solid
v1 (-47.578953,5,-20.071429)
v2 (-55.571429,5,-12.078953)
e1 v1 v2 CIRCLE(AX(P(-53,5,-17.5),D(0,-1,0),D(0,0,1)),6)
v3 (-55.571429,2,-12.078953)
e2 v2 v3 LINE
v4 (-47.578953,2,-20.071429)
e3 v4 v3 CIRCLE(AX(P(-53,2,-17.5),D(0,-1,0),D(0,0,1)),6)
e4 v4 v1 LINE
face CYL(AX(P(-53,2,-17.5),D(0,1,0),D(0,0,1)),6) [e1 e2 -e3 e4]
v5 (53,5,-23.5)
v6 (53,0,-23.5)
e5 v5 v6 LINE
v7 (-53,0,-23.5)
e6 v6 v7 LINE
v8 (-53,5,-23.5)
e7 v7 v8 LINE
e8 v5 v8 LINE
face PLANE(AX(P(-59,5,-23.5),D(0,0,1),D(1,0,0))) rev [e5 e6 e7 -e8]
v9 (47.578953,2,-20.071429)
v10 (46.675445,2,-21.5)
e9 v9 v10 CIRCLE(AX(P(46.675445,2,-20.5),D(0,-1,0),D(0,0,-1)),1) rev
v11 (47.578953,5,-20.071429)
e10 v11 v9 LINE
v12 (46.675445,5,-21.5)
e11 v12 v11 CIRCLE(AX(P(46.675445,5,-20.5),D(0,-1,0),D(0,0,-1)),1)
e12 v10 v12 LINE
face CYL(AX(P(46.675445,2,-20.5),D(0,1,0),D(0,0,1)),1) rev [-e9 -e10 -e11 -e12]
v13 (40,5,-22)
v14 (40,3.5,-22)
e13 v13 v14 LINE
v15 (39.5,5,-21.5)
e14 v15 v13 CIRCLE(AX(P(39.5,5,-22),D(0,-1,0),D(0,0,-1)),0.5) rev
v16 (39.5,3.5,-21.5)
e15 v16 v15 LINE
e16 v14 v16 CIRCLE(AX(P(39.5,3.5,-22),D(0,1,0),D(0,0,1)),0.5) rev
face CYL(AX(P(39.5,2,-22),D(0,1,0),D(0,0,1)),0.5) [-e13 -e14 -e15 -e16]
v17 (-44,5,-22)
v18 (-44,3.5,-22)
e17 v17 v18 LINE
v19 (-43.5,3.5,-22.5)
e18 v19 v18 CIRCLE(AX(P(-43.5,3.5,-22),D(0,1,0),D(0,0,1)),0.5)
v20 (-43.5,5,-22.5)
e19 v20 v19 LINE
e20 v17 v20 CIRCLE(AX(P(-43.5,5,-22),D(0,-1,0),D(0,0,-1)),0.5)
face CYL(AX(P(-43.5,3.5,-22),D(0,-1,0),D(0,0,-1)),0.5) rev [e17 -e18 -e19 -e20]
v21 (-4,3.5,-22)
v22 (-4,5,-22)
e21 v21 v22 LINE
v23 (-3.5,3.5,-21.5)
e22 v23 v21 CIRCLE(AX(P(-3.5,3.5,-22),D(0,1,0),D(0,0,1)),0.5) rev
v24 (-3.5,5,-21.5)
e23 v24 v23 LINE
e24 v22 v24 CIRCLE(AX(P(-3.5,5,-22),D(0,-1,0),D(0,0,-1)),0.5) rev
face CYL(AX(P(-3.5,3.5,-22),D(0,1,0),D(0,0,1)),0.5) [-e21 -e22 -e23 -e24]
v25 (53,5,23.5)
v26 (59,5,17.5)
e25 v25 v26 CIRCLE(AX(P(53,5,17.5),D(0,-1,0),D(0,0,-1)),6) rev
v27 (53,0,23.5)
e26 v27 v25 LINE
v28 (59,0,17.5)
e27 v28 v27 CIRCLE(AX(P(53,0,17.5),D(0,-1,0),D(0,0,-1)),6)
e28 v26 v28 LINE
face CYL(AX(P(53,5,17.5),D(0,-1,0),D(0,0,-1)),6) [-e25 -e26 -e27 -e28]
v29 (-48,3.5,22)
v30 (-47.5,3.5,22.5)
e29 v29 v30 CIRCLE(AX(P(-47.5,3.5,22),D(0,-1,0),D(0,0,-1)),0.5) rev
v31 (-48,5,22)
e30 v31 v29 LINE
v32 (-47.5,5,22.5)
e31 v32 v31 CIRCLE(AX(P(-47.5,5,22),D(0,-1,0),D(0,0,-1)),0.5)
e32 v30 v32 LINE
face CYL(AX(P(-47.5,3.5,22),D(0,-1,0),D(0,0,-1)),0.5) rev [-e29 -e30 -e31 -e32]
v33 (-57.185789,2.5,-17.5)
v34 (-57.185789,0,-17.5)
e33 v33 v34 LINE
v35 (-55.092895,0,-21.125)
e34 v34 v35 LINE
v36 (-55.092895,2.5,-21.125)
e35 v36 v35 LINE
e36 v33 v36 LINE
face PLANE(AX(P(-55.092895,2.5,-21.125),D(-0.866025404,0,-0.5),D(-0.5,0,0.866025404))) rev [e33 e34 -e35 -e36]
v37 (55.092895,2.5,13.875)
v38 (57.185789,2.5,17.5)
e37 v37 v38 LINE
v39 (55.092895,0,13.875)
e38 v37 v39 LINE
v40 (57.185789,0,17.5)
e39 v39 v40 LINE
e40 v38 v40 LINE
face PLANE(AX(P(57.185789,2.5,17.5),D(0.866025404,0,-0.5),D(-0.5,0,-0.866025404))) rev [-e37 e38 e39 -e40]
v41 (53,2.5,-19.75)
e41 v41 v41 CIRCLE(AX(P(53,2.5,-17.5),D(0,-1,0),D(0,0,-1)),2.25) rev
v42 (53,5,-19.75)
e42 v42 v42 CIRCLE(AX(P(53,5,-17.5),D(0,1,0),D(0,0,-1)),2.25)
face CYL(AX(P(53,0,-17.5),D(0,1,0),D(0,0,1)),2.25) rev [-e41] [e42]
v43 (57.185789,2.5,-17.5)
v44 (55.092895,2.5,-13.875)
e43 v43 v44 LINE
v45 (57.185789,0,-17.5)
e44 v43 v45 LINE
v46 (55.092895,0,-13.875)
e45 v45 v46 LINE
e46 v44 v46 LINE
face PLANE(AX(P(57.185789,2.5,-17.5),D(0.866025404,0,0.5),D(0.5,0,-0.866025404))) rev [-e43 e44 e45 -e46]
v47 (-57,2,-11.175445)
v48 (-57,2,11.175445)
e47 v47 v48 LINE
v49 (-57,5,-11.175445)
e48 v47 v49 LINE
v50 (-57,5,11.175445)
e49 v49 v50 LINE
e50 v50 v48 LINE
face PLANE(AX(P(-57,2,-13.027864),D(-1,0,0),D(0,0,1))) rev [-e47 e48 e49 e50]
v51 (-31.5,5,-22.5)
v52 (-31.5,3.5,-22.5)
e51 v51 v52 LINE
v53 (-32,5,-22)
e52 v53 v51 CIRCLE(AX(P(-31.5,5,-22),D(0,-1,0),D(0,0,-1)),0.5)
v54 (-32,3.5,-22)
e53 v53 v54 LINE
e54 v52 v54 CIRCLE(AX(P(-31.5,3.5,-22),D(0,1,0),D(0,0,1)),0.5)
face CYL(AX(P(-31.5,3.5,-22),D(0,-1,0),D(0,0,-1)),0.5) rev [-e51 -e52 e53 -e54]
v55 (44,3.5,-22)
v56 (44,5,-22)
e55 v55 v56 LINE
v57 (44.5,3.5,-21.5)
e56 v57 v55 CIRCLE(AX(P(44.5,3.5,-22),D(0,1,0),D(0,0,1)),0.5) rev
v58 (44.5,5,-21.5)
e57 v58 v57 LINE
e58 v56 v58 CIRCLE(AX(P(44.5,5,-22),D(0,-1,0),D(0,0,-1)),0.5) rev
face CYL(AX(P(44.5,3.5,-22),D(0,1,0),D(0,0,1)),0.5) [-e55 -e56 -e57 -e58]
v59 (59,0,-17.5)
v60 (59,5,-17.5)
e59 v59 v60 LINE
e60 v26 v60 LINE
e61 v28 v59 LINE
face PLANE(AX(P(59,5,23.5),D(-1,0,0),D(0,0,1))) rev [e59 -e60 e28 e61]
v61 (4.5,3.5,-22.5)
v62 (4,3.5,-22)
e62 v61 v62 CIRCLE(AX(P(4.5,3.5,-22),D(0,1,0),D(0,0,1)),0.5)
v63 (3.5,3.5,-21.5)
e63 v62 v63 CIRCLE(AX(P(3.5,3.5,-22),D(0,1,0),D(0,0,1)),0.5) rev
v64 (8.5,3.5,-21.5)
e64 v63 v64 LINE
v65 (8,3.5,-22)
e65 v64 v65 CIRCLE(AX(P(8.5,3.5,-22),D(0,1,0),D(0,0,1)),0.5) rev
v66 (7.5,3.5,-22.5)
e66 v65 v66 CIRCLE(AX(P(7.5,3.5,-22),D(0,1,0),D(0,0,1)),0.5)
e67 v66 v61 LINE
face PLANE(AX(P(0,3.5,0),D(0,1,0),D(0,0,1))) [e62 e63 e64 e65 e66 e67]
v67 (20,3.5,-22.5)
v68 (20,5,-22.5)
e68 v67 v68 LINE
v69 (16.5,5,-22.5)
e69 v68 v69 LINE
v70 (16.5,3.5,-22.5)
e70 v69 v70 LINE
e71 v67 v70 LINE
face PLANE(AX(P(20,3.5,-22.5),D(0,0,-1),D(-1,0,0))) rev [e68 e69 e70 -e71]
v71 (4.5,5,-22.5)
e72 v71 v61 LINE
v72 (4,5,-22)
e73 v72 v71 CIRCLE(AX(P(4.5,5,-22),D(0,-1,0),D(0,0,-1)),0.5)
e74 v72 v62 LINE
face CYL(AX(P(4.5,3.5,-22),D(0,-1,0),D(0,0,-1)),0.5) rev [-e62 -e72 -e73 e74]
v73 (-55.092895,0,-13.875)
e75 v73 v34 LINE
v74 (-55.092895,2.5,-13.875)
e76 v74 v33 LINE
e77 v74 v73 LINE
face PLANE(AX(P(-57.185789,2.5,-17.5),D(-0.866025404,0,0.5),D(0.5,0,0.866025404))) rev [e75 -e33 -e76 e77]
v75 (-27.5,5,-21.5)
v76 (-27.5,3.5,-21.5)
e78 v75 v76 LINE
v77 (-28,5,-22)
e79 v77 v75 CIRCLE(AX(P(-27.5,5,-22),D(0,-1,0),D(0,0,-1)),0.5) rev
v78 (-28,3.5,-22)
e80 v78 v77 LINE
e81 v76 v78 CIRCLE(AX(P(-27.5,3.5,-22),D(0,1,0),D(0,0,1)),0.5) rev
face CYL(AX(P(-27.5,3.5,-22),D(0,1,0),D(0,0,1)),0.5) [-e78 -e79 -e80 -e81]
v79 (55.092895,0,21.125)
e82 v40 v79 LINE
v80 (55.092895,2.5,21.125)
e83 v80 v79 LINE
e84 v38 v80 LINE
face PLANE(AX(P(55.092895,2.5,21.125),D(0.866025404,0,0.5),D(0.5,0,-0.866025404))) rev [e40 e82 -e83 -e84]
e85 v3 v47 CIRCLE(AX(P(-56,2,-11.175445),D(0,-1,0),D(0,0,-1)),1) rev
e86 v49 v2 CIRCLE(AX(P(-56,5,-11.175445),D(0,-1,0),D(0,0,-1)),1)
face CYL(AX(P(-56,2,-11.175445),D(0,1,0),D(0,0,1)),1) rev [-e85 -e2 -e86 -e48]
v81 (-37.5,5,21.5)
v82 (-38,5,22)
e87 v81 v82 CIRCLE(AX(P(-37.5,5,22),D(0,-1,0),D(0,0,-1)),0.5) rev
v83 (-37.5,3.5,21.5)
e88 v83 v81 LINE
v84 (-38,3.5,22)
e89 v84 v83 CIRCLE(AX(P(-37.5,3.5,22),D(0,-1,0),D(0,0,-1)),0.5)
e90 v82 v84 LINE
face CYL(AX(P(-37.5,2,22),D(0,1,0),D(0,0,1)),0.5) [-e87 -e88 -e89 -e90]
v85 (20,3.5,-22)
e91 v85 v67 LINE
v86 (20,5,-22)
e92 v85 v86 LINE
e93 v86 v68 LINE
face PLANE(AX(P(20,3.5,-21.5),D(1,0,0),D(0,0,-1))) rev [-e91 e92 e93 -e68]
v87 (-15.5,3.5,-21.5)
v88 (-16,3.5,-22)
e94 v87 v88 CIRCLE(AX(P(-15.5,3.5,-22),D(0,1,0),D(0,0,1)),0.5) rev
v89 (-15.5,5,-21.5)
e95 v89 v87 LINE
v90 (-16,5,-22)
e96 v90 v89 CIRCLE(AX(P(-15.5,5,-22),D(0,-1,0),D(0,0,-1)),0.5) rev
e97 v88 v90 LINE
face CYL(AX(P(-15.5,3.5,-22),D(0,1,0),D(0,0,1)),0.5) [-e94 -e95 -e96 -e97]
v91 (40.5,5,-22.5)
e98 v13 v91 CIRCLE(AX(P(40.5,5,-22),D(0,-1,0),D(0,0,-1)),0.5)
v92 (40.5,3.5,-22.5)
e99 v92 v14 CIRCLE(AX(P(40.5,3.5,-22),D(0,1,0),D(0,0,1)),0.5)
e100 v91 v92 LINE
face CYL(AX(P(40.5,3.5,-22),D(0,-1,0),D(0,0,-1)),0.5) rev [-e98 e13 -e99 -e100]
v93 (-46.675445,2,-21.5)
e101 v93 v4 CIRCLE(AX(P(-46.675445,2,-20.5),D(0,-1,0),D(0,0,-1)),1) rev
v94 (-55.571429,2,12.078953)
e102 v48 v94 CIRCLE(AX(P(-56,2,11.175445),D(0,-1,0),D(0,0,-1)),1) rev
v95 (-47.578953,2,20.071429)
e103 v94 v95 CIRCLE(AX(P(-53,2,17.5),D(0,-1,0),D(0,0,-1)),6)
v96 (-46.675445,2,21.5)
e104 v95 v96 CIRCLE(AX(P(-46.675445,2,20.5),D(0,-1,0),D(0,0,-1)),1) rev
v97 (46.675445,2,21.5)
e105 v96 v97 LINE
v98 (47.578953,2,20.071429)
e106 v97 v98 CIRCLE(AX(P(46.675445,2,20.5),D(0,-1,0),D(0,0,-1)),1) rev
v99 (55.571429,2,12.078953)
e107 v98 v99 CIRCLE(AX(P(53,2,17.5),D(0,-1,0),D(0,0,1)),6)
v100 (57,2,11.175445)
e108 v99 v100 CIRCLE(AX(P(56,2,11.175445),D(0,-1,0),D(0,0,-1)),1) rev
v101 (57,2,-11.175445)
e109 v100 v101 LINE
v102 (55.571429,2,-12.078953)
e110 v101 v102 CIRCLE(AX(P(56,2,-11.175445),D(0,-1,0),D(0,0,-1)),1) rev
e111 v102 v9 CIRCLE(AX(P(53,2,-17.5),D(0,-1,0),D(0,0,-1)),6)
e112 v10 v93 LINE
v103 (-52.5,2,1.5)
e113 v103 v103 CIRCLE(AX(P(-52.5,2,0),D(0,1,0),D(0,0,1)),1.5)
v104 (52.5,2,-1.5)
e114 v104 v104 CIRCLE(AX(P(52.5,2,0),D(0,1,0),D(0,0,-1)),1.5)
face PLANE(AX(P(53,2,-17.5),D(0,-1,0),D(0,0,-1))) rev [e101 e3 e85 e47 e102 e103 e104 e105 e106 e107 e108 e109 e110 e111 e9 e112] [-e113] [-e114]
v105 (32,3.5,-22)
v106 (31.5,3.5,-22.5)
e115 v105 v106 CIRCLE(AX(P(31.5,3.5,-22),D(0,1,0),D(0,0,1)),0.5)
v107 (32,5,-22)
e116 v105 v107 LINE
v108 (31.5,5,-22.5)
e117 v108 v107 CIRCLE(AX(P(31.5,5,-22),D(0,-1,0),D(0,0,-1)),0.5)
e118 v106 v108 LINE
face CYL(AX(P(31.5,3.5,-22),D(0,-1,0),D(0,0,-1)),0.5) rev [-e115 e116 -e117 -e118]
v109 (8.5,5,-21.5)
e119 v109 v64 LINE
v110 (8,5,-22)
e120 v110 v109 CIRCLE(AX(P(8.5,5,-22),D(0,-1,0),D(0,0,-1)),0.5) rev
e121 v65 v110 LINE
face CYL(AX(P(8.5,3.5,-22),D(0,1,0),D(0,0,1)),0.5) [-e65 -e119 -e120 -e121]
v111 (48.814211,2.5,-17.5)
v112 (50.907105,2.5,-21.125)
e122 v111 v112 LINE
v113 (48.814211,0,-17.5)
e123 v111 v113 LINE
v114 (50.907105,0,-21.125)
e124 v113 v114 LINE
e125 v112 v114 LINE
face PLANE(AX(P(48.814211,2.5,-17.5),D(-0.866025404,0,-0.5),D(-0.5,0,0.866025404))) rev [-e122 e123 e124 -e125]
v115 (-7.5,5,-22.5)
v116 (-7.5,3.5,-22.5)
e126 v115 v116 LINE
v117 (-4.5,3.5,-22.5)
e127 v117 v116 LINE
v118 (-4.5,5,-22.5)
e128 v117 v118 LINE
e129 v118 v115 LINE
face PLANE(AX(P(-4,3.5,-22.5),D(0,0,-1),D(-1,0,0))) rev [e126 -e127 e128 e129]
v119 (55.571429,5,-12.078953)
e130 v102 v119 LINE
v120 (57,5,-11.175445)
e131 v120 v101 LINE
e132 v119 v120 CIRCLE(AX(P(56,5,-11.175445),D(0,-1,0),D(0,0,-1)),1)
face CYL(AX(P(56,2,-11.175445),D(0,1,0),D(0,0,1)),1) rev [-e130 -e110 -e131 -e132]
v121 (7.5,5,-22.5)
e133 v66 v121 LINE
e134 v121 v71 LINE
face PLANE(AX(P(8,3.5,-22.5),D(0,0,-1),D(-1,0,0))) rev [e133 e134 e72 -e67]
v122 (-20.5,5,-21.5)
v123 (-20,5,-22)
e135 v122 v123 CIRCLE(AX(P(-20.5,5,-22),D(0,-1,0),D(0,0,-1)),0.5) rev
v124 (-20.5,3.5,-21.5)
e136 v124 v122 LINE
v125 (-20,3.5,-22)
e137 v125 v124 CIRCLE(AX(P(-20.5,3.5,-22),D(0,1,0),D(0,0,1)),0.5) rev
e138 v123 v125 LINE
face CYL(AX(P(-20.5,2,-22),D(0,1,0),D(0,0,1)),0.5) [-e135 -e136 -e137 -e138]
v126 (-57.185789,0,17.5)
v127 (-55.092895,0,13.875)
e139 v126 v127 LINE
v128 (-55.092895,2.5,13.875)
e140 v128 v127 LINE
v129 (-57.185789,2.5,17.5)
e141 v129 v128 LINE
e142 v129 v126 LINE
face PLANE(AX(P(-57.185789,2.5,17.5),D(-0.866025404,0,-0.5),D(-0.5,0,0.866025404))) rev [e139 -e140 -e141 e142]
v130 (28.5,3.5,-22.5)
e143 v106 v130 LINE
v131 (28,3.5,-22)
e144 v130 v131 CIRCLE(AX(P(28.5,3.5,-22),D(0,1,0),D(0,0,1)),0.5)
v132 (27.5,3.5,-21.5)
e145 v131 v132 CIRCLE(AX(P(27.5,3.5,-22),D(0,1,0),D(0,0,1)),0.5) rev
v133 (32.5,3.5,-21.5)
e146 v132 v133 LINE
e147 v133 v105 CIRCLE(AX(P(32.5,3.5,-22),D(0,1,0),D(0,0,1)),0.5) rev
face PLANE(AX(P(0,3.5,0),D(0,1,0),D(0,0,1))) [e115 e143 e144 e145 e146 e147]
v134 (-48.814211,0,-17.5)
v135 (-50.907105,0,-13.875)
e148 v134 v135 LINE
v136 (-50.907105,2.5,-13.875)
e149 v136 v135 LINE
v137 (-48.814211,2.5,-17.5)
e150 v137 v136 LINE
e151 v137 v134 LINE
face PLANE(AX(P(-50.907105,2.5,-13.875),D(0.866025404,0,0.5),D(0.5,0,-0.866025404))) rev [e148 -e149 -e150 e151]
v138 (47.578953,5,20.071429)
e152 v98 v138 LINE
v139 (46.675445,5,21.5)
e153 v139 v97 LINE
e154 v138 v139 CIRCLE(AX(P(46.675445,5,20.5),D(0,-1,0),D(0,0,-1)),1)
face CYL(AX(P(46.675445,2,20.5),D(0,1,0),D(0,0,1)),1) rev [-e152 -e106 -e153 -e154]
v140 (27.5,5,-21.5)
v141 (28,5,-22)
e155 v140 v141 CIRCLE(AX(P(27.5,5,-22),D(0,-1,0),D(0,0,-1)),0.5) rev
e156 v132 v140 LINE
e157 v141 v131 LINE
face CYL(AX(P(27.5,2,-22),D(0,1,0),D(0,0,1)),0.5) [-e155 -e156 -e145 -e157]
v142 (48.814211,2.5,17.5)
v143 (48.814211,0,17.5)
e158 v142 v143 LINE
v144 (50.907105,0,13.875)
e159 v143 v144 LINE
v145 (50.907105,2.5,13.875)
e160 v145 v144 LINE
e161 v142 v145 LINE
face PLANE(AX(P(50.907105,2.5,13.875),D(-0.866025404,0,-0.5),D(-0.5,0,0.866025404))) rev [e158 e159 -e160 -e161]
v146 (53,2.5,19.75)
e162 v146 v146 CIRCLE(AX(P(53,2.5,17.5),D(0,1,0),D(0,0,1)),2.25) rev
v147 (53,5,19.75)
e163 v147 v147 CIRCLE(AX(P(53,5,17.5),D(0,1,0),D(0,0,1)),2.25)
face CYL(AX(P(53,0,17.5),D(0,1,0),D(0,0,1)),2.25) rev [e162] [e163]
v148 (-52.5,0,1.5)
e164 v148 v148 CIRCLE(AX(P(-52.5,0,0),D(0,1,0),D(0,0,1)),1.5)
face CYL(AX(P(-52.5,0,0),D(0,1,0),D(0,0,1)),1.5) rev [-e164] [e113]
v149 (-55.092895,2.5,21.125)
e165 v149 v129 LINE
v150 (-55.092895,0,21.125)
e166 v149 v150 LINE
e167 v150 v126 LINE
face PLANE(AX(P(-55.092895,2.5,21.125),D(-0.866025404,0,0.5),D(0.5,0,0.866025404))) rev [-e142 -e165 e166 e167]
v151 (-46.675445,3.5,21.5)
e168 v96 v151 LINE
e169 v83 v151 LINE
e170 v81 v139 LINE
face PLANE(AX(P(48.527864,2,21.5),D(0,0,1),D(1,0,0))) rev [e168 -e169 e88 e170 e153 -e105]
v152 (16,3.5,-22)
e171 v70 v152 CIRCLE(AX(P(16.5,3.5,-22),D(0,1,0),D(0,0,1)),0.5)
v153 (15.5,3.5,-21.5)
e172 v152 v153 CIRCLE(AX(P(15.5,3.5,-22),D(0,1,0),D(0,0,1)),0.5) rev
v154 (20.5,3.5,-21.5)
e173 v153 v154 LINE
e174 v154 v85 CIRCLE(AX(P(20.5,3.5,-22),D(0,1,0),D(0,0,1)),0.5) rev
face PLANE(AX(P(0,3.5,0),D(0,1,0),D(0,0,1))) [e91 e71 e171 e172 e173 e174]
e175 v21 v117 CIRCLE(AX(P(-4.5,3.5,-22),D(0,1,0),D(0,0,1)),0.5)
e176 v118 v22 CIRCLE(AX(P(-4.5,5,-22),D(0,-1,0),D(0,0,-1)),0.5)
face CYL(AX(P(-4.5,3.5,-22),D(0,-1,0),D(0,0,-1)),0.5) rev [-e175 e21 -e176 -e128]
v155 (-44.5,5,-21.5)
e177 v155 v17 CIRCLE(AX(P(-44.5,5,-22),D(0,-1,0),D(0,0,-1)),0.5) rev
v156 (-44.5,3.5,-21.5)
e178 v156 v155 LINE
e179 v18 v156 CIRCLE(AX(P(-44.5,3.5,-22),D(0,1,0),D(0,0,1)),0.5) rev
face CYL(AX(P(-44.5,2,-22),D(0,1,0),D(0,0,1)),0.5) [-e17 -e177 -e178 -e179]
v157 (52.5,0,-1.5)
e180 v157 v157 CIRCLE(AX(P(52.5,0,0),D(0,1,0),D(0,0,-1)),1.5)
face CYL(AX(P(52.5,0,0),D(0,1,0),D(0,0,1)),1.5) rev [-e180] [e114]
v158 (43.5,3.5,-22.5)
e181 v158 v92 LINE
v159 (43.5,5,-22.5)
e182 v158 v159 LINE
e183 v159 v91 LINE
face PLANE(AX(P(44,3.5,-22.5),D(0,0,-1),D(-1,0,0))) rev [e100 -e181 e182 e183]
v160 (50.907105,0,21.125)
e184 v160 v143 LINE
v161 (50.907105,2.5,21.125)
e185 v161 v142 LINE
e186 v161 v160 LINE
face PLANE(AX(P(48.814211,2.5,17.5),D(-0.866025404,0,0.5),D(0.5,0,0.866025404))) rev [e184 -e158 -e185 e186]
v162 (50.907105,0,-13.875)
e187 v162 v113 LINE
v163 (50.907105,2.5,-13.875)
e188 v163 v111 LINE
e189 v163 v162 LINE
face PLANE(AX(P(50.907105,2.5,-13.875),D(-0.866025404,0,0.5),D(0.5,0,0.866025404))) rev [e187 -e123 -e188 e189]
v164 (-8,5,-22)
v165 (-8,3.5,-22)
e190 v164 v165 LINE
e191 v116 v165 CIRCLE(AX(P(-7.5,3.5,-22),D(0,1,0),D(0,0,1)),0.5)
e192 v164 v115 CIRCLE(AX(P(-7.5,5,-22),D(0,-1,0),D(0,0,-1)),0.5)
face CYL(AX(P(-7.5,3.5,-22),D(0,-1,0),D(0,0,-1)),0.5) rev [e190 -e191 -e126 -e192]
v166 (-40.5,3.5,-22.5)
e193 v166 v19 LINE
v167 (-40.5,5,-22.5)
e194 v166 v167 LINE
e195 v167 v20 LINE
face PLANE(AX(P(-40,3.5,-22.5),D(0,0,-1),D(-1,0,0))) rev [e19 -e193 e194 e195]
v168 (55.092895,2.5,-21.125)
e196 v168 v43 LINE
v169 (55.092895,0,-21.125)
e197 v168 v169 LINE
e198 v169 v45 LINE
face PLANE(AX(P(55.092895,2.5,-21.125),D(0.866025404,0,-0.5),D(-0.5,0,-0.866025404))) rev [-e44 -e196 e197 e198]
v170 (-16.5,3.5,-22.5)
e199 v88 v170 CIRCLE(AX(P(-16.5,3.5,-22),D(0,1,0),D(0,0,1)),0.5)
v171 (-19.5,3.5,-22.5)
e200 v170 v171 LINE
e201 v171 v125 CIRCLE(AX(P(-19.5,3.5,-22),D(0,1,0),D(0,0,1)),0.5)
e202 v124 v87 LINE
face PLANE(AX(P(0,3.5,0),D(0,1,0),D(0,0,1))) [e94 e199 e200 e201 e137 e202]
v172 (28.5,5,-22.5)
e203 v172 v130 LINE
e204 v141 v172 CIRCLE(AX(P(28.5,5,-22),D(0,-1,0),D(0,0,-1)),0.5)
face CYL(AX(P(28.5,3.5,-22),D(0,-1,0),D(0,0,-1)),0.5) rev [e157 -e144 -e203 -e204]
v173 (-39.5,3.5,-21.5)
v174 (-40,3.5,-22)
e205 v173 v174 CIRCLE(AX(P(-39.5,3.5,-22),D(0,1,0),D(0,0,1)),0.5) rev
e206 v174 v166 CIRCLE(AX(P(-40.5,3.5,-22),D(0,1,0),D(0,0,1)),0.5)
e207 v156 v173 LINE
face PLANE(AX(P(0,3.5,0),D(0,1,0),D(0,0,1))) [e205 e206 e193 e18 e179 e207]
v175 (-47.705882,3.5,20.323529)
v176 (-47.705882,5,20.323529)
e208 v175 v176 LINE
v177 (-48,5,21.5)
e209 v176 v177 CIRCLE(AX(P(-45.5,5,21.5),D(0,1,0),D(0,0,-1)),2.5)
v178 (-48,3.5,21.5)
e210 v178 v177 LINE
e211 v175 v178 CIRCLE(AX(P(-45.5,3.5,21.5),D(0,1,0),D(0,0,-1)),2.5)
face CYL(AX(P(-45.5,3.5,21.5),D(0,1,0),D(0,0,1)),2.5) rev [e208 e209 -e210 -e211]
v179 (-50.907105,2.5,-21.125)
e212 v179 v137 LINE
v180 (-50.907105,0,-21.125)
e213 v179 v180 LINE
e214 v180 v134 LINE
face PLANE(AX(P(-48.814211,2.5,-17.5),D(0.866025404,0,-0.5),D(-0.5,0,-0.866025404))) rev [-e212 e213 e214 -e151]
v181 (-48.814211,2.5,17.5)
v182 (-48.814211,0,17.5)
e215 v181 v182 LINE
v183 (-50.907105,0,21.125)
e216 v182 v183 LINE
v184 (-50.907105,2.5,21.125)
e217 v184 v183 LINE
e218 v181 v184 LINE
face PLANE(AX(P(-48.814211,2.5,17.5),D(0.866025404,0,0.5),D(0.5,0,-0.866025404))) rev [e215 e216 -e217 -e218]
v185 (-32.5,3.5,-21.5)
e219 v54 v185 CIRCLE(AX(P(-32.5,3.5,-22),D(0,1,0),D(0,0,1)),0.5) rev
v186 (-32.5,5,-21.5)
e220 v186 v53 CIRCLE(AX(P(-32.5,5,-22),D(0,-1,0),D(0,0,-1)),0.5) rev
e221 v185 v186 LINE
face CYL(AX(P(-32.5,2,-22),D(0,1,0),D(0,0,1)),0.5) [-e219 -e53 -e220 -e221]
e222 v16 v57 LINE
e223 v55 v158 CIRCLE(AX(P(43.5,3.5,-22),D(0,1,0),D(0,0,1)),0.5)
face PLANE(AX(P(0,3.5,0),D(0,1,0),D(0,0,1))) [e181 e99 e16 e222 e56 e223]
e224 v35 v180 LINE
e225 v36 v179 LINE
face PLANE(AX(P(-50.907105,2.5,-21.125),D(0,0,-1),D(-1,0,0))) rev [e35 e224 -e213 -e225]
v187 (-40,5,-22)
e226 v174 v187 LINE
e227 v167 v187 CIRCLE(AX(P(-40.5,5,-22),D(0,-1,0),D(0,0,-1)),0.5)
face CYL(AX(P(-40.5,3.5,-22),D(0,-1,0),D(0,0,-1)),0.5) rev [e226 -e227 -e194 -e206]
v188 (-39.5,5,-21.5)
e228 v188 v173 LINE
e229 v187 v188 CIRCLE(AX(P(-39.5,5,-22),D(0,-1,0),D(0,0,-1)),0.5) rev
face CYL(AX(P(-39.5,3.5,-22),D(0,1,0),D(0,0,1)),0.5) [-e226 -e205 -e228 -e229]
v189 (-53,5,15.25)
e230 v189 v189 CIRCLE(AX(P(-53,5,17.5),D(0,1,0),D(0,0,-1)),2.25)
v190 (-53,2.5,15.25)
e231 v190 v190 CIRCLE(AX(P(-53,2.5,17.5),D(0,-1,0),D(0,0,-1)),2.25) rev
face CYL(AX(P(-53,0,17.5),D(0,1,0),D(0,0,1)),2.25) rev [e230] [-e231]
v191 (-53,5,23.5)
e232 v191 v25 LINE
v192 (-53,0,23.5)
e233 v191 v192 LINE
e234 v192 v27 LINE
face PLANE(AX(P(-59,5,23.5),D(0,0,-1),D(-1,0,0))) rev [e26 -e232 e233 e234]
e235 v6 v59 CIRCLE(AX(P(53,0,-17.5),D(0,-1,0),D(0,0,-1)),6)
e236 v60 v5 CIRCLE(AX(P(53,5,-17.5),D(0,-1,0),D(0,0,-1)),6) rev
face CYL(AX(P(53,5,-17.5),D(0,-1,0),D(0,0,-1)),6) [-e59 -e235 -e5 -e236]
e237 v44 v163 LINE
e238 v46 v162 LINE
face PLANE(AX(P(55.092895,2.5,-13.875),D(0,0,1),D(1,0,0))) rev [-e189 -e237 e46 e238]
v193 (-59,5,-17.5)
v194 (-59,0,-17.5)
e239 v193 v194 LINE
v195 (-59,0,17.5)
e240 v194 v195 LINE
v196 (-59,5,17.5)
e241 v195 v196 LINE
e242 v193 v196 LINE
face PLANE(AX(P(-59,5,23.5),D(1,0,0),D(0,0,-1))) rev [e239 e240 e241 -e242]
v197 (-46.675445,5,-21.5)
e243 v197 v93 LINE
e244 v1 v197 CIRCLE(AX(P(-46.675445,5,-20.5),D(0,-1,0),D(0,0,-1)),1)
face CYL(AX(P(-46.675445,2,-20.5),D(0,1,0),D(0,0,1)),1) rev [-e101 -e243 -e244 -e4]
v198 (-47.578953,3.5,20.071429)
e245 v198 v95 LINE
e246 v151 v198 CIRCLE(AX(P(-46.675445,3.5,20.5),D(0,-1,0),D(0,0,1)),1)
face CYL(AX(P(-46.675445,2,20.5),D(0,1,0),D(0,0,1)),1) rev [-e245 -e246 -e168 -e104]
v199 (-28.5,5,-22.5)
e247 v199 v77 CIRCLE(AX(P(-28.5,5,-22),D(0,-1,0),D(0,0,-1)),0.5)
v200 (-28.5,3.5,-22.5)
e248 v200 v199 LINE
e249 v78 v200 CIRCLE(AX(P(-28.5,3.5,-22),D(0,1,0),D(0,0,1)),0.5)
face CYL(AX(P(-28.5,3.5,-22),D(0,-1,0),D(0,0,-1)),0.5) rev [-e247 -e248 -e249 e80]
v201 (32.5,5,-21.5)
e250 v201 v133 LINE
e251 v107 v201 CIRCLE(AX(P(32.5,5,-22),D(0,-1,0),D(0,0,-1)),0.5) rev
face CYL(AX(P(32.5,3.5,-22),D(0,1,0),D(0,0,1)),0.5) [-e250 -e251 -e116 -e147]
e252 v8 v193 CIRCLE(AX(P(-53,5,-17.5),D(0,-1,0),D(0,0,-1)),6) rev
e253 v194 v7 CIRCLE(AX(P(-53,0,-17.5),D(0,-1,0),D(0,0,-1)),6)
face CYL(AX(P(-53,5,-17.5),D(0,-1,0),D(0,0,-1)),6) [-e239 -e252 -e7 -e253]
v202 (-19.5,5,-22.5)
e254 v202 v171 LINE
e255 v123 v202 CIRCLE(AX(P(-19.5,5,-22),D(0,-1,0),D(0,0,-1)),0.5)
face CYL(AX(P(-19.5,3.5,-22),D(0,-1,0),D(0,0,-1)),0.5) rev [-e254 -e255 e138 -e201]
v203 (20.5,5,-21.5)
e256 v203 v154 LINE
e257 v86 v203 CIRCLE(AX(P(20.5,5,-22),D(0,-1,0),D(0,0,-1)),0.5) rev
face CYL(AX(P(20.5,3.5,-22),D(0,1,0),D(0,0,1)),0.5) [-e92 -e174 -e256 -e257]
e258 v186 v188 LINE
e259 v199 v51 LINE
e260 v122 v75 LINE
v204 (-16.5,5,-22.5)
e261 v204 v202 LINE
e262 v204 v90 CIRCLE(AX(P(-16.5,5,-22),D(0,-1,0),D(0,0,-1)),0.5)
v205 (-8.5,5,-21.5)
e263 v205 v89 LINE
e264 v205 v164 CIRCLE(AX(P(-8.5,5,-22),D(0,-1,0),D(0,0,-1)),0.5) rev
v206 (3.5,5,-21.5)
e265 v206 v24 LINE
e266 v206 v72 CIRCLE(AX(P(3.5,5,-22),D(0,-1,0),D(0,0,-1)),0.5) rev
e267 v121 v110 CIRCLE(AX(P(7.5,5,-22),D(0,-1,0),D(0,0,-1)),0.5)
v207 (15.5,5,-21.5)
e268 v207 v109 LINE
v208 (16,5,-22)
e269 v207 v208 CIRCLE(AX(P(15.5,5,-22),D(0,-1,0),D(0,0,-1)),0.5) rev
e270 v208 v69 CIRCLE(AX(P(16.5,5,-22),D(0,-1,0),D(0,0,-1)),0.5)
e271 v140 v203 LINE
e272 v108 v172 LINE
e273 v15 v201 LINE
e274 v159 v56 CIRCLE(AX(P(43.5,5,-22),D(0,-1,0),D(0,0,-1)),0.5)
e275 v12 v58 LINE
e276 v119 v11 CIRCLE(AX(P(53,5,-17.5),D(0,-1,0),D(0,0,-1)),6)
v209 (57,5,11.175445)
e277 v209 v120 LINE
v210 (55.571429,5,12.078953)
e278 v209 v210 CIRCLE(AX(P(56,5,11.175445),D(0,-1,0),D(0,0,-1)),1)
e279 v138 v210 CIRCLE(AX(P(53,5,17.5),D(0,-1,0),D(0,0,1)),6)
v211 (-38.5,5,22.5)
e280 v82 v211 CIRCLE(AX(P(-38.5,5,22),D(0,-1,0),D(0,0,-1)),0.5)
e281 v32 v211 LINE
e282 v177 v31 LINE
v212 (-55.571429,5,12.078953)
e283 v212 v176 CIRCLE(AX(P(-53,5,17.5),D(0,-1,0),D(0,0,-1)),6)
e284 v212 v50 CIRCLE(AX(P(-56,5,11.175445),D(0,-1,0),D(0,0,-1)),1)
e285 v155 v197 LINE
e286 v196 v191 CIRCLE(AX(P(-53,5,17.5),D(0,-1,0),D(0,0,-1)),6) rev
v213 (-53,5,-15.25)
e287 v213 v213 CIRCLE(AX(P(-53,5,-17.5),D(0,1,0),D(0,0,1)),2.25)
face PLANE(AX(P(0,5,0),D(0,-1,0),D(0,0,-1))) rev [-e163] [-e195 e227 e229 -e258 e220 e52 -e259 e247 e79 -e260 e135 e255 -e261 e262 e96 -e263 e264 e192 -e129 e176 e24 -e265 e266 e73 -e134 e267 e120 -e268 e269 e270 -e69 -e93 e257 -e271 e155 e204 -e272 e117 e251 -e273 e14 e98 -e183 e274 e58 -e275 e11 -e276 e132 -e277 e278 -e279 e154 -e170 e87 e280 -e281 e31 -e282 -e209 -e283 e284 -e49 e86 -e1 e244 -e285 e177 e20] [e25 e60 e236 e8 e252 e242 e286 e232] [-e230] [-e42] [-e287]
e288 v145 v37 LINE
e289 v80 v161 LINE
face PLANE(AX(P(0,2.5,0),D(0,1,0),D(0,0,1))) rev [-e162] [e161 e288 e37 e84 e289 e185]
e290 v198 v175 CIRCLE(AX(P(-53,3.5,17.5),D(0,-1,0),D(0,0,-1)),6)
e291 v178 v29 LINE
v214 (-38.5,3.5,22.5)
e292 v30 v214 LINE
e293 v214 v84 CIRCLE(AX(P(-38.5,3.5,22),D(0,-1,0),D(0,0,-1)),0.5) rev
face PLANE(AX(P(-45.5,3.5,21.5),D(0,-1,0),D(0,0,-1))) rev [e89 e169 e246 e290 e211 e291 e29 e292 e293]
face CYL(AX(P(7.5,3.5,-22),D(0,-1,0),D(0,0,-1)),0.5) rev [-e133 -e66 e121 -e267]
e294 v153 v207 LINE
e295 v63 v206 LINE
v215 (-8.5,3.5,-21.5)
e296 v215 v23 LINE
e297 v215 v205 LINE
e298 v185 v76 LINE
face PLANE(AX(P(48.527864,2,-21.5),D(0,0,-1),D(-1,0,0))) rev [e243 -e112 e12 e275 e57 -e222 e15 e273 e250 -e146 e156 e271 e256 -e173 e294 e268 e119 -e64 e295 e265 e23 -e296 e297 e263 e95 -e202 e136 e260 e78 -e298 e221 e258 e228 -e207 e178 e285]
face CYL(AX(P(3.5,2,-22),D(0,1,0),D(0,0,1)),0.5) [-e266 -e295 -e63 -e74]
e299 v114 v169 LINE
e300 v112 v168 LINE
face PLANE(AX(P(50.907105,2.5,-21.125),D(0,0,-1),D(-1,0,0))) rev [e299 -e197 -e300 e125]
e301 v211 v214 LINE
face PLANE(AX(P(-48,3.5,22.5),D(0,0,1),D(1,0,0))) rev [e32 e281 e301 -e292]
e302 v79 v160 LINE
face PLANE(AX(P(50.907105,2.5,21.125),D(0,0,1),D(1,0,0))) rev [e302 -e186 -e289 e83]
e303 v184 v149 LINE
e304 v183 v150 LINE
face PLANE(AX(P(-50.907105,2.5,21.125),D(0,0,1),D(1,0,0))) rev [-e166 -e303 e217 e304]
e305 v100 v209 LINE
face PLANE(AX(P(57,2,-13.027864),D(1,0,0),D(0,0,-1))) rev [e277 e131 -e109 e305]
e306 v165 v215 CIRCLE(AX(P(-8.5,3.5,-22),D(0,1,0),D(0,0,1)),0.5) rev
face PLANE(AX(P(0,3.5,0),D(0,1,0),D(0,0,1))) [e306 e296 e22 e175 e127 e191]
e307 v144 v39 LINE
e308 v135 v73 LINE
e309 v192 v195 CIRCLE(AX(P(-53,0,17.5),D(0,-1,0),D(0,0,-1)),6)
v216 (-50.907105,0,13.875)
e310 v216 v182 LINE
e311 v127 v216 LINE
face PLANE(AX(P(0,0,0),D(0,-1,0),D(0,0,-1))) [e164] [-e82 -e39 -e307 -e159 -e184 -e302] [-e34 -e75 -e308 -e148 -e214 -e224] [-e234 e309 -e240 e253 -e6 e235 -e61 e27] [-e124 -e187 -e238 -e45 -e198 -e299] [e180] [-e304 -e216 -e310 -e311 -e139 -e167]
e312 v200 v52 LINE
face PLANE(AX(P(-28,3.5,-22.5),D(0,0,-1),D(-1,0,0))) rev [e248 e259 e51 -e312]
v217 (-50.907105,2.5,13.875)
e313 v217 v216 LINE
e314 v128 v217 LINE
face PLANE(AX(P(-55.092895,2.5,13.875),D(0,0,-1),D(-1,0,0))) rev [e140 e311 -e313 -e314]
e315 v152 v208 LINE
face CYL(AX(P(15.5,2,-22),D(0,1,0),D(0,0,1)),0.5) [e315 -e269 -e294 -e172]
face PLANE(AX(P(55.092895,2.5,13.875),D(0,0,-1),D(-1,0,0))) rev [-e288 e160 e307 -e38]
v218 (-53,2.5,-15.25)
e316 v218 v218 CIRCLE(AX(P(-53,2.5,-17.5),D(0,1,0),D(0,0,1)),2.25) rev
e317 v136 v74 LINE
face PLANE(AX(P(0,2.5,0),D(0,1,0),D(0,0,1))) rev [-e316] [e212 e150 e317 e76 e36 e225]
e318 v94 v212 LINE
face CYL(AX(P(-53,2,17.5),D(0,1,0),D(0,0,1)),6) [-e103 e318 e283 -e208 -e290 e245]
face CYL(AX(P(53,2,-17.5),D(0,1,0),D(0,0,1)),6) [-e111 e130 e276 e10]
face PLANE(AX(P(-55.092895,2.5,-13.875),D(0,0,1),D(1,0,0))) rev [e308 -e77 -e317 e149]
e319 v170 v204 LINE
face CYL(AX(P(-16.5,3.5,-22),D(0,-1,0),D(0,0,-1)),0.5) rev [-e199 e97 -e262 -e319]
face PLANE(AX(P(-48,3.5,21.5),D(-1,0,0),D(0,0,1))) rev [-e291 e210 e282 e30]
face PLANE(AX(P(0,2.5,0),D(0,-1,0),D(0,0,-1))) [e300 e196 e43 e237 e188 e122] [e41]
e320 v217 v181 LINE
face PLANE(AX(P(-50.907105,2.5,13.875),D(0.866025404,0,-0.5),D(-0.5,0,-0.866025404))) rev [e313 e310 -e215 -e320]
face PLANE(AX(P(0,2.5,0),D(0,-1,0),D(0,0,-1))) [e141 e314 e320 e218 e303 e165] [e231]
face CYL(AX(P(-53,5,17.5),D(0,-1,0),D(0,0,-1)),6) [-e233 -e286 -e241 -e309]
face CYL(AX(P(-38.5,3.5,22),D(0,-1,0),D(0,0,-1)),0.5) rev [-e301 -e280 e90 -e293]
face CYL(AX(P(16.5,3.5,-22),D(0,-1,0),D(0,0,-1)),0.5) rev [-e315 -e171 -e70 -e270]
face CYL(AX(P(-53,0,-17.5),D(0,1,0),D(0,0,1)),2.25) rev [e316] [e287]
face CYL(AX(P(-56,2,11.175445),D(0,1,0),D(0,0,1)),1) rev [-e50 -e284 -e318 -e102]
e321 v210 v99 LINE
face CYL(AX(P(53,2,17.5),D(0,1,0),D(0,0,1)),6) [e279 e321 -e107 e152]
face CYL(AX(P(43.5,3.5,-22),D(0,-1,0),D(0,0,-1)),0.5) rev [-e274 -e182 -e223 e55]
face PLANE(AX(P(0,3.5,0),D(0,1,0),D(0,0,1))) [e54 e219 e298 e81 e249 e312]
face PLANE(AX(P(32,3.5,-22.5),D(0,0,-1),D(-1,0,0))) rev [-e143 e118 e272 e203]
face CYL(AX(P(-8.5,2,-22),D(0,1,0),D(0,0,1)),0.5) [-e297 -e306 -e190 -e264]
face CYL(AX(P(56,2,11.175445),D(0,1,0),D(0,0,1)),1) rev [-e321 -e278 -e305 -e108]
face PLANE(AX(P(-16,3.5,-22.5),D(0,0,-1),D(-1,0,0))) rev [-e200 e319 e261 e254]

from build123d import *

# Parameters (mm, degrees)
SKETCH1_W           = 118
SKETCH1_H           = 47
BOSS_EXTRUDE1_DEPTH = 5
FILLET1_R           = 6
SKETCH4_R           = 2.25
CUT_EXTRUDE1_DEPTH  = 64.704395453
CUT_EXTRUDE2_DEPTH  = 2.5
CUT_EXTRUDE3_DEPTH  = 3
FILLET2_R           = 1
SKETCH7_W           = 4
SKETCH7_H           = 1
CUT_EXTRUDE4_DEPTH  = 1.5
FILLET3_START       = 3.5
FILLET3_DEPTH       = 2.5
FILLET3_2_DEPTH     = 1.5
SKETCH8_R           = 1.5
CUT_EXTRUDE5_DEPTH  = 64.578691399


with BuildPart() as part:
    # Sketch1 → Boss-Extrude1 (new body)
    with BuildSketch(Plane(origin=(0, 0, 0), x_dir=(1, 0, 0), z_dir=(0, 1, 0))):
        Rectangle(SKETCH1_W, SKETCH1_H)
    extrude(amount=BOSS_EXTRUDE1_DEPTH)

    # Fillet1
    fillet1_edges = [part.edges().sort_by_distance(p)[0] for p in [
        (59, 2.5, 23.5),
        (-59, 2.5, 23.5),
        (-59, 2.5, -23.5),
        (59, 2.5, -23.5),
    ]]
    fillet(fillet1_edges, radius=FILLET1_R)

    # Sketch4 → Cut-Extrude1 (cut, through all)
    with BuildSketch(Plane(origin=(0, 5, 0), x_dir=(1, 0, 0), z_dir=(0, 1, 0))):
        with Locations(Location((53, -17.5, 0), (0, 0, 270))):
            Circle(SKETCH4_R)
        with Locations(Location((-53, -17.5, 0), (0, 0, 90))):
            Circle(SKETCH4_R)
        with Locations(Location((53, 17.5, 0), (0, 0, 90))):
            Circle(SKETCH4_R)
        with Locations(Location((-53, 17.5, 0), (0, 0, 270))):
            Circle(SKETCH4_R)
    extrude(amount=-CUT_EXTRUDE1_DEPTH, mode=Mode.SUBTRACT)

    # Sketch5 → Cut-Extrude2 (cut)
    with BuildSketch(Plane.XZ):
        Polygon((50.907105274, -13.875), (48.814210548, -17.5), (50.907105274, -21.125), (55.092894726, -21.125), (57.185789452, -17.5), (55.092894726, -13.875), align=None)
        Polygon((57.185789452, 17.5), (55.092894726, 13.875), (50.907105274, 13.875), (48.814210548, 17.5), (50.907105274, 21.125), (55.092894726, 21.125), align=None)
        Polygon((-57.185789452, -17.5), (-55.092894726, -13.875), (-50.907105274, -13.875), (-48.814210548, -17.5), (-50.907105274, -21.125), (-55.092894726, -21.125), align=None)
        Polygon((-55.092894726, 13.875), (-50.907105274, 13.875), (-48.814210548, 17.5), (-50.907105274, 21.125), (-55.092894726, 21.125), (-57.185789452, 17.5), align=None)
    extrude(amount=-CUT_EXTRUDE2_DEPTH, mode=Mode.SUBTRACT)

    # Sketch6 → Cut-Extrude3 (cut)
    with BuildSketch(Plane(origin=(0, 5, 0), x_dir=(1, 0, 0), z_dir=(0, 1, 0))):
        with BuildLine():
            Line((57, 13.027864045), (57, -13.027864045))
            ThreePointArc((57, -13.027864045), (48.757359313, -13.257359313), (48.527864045, -21.5))
            Line((48.527864045, -21.5), (-48.527864045, -21.5))
            ThreePointArc((-48.527864045, -21.5), (-48.757359313, -13.257359313), (-57, -13.027864045))
            Line((-57, -13.027864045), (-57, 13.027864045))
            ThreePointArc((-57, 13.027864045), (-48.757359313, 13.257359313), (-48.527864045, 21.5))
            Line((-48.527864045, 21.5), (48.527864045, 21.5))
            ThreePointArc((48.527864045, 21.5), (48.757359313, 13.257359313), (57, 13.027864045))
        make_face()
    extrude(amount=-CUT_EXTRUDE3_DEPTH, mode=Mode.SUBTRACT)

    # Fillet2
    fillet2_edges = [part.edges().sort_by_distance(p)[0] for p in [
        (48.527864045, 3.5, -21.5),
        (57, 3.5, -13.027864045),
        (57, 3.5, 13.027864045),
        (48.527864045, 3.5, 21.5),
        (-48.527864045, 3.5, 21.5),
        (-57, 3.5, 13.027864045),
        (-57, 3.5, -13.027864045),
        (-48.527864045, 3.5, -21.5),
    ]]
    fillet(fillet2_edges, radius=FILLET2_R)

    # Sketch7 → Cut-Extrude4 (cut)
    with BuildSketch(Plane(origin=(0, 5, 0), x_dir=(1, 0, 0), z_dir=(0, 1, 0))):
        with BuildLine():
            Line((-48, -21.5), (-48, -22.5))
            Line((-48, -22.5), (-38, -22.5))
            Line((-38, -22.5), (-38, -21.5))
            Line((-38, -21.5), (-46.67544468, -21.5))
            ThreePointArc((-46.67544468, -21.5), (-47.520598934, -21.034522484), (-47.578952583, -20.071428571))
            ThreePointArc((-47.578952583, -20.071428571), (-47.640934848, -20.198225473), (-47.705882353, -20.323529412))
            ThreePointArc((-47.705882353, -20.323529412), (-47.92535625, -20.893660937), (-48, -21.5))
        make_face()
        with Locations((-42, 22)):
            Rectangle(SKETCH7_W, SKETCH7_H)
        with Locations((-30, 22)):
            Rectangle(SKETCH7_W, SKETCH7_H)
        with Locations((-18, 22)):
            Rectangle(SKETCH7_W, SKETCH7_H)
        with Locations((-6, 22)):
            Rectangle(SKETCH7_W, SKETCH7_H)
        with Locations((6, 22)):
            Rectangle(SKETCH7_W, SKETCH7_H)
        with Locations((18, 22)):
            Rectangle(SKETCH7_W, SKETCH7_H)
        with Locations((30, 22)):
            Rectangle(SKETCH7_W, SKETCH7_H)
        with Locations((42, 22)):
            Rectangle(SKETCH7_W, SKETCH7_H)
    extrude(amount=-CUT_EXTRUDE4_DEPTH, mode=Mode.SUBTRACT)

    # Fillet3: read off the stored shape, not the designer's step
    # Fillet3 outline → Fillet3 (cut)
    with BuildSketch(Plane(origin=(0, 0, 0), x_dir=(1, 0, 0), z_dir=(0, 1, 0)).offset(FILLET3_START)):
        with BuildLine():
            Line((-40, 21.5), (-39.5, 21.5))
            ThreePointArc((-39.5, 21.5), (-39.853553391, 21.646446609), (-40, 22))
            Line((-40, 22), (-40, 21.5))
        make_face()
        with BuildLine():
            Line((-28, 21.5), (-27.5, 21.5))
            ThreePointArc((-27.5, 21.5), (-27.853553391, 21.646446609), (-28, 22))
            Line((-28, 22), (-28, 21.5))
        make_face()
        with BuildLine():
            Line((-16, 21.5), (-15.5, 21.5))
            ThreePointArc((-15.5, 21.5), (-15.853553391, 21.646446609), (-16, 22))
            Line((-16, 22), (-16, 21.5))
        make_face()
        with BuildLine():
            Line((-4, 21.5), (-3.5, 21.5))
            ThreePointArc((-3.5, 21.5), (-3.853553391, 21.646446609), (-4, 22))
            Line((-4, 22), (-4, 21.5))
        make_face()
        with BuildLine():
            Line((8, 21.5), (8.5, 21.5))
            ThreePointArc((8.5, 21.5), (8.146446609, 21.646446609), (8, 22))
            Line((8, 22), (8, 21.5))
        make_face()
        with BuildLine():
            Line((20, 21.5), (20.5, 21.5))
            ThreePointArc((20.5, 21.5), (20.146446609, 21.646446609), (20, 22))
            Line((20, 22), (20, 21.5))
        make_face()
        with BuildLine():
            Line((32, 21.5), (32.5, 21.5))
            ThreePointArc((32.5, 21.5), (32.146446609, 21.646446609), (32, 22))
            Line((32, 22), (32, 21.5))
        make_face()
        with BuildLine():
            ThreePointArc((44.5, 21.5), (44.146446609, 21.646446609), (44, 22))
            Line((44, 22), (44, 21.5))
            Line((44, 21.5), (44.5, 21.5))
        make_face()
        with BuildLine():
            Line((39.5, 21.5), (40, 21.5))
            Line((40, 21.5), (40, 22))
            ThreePointArc((40, 22), (39.853553391, 21.646446609), (39.5, 21.5))
        make_face()
        with BuildLine():
            Line((27.5, 21.5), (28, 21.5))
            Line((28, 21.5), (28, 22))
            ThreePointArc((28, 22), (27.853553391, 21.646446609), (27.5, 21.5))
        make_face()
        with BuildLine():
            Line((15.5, 21.5), (16, 21.5))
            Line((16, 21.5), (16, 22))
            ThreePointArc((16, 22), (15.853553391, 21.646446609), (15.5, 21.5))
        make_face()
        with BuildLine():
            Line((3.5, 21.5), (4, 21.5))
            Line((4, 21.5), (4, 22))
            ThreePointArc((4, 22), (3.853553391, 21.646446609), (3.5, 21.5))
        make_face()
        with BuildLine():
            Line((-8.5, 21.5), (-8, 21.5))
            Line((-8, 21.5), (-8, 22))
            ThreePointArc((-8, 22), (-8.146446609, 21.646446609), (-8.5, 21.5))
        make_face()
        with BuildLine():
            Line((-20.5, 21.5), (-20, 21.5))
            Line((-20, 21.5), (-20, 22))
            ThreePointArc((-20, 22), (-20.146446609, 21.646446609), (-20.5, 21.5))
        make_face()
        with BuildLine():
            Line((-32.5, 21.5), (-32, 21.5))
            Line((-32, 21.5), (-32, 22))
            ThreePointArc((-32, 22), (-32.146446609, 21.646446609), (-32.5, 21.5))
        make_face()
        with BuildLine():
            Line((-44.5, 21.5), (-44, 21.5))
            Line((-44, 21.5), (-44, 22))
            ThreePointArc((-44, 22), (-44.146446609, 21.646446609), (-44.5, 21.5))
        make_face()
        with BuildLine():
            Line((-38, -21.5), (-38, -22))
            ThreePointArc((-38, -22), (-37.853553391, -21.646446609), (-37.5, -21.5))
            Line((-37.5, -21.5), (-38, -21.5))
        make_face()
    extrude(amount=FILLET3_DEPTH, mode=Mode.SUBTRACT)

    # Fillet3 2 outline → Fillet3 2 (add)
    with BuildSketch(Plane(origin=(0, 0, 0), x_dir=(1, 0, 0), z_dir=(0, 1, 0)).offset(FILLET3_START)):
        with BuildLine():
            ThreePointArc((43.5, 22.5), (43.853553391, 22.353553391), (44, 22))
            Line((44, 22), (44, 22.5))
            Line((44, 22.5), (43.5, 22.5))
        make_face()
        with BuildLine():
            ThreePointArc((40, 22), (40.146446609, 22.353553391), (40.5, 22.5))
            Line((40.5, 22.5), (40, 22.5))
            Line((40, 22.5), (40, 22))
        make_face()
        with BuildLine():
            ThreePointArc((31.5, 22.5), (31.853553391, 22.353553391), (32, 22))
            Line((32, 22), (32, 22.5))
            Line((32, 22.5), (31.5, 22.5))
        make_face()
        with BuildLine():
            ThreePointArc((28, 22), (28.146446609, 22.353553391), (28.5, 22.5))
            Line((28.5, 22.5), (28, 22.5))
            Line((28, 22.5), (28, 22))
        make_face()
        with BuildLine():
            ThreePointArc((16, 22), (16.146446609, 22.353553391), (16.5, 22.5))
            Line((16.5, 22.5), (16, 22.5))
            Line((16, 22.5), (16, 22))
        make_face()
        with BuildLine():
            ThreePointArc((7.5, 22.5), (7.853553391, 22.353553391), (8, 22))
            Line((8, 22), (8, 22.5))
            Line((8, 22.5), (7.5, 22.5))
        make_face()
        with BuildLine():
            ThreePointArc((4, 22), (4.146446609, 22.353553391), (4.5, 22.5))
            Line((4.5, 22.5), (4, 22.5))
            Line((4, 22.5), (4, 22))
        make_face()
        with BuildLine():
            ThreePointArc((-4.5, 22.5), (-4.146446609, 22.353553391), (-4, 22))
            Line((-4, 22), (-4, 22.5))
            Line((-4, 22.5), (-4.5, 22.5))
        make_face()
        with BuildLine():
            ThreePointArc((-8, 22), (-7.853553391, 22.353553391), (-7.5, 22.5))
            Line((-7.5, 22.5), (-8, 22.5))
            Line((-8, 22.5), (-8, 22))
        make_face()
        with BuildLine():
            ThreePointArc((-16.5, 22.5), (-16.146446609, 22.353553391), (-16, 22))
            Line((-16, 22), (-16, 22.5))
            Line((-16, 22.5), (-16.5, 22.5))
        make_face()
        with BuildLine():
            ThreePointArc((-20, 22), (-19.853553391, 22.353553391), (-19.5, 22.5))
            Line((-19.5, 22.5), (-20, 22.5))
            Line((-20, 22.5), (-20, 22))
        make_face()
        with BuildLine():
            ThreePointArc((-28.5, 22.5), (-28.146446609, 22.353553391), (-28, 22))
            Line((-28, 22), (-28, 22.5))
            Line((-28, 22.5), (-28.5, 22.5))
        make_face()
        with BuildLine():
            ThreePointArc((-32, 22), (-31.853553391, 22.353553391), (-31.5, 22.5))
            Line((-31.5, 22.5), (-32, 22.5))
            Line((-32, 22.5), (-32, 22))
        make_face()
        with BuildLine():
            ThreePointArc((-40.5, 22.5), (-40.146446609, 22.353553391), (-40, 22))
            Line((-40, 22), (-40, 22.5))
            Line((-40, 22.5), (-40.5, 22.5))
        make_face()
        with BuildLine():
            ThreePointArc((-44, 22), (-43.853553391, 22.353553391), (-43.5, 22.5))
            Line((-43.5, 22.5), (-44, 22.5))
            Line((-44, 22.5), (-44, 22))
        make_face()
        with BuildLine():
            Line((-48, -22.5), (-47.5, -22.5))
            ThreePointArc((-47.5, -22.5), (-47.853553391, -22.353553391), (-48, -22))
            Line((-48, -22), (-48, -22.5))
        make_face()
        with BuildLine():
            ThreePointArc((-38, -22), (-38.146446609, -22.353553391), (-38.5, -22.5))
            Line((-38.5, -22.5), (-38, -22.5))
            Line((-38, -22.5), (-38, -22))
        make_face()
    extrude(amount=FILLET3_2_DEPTH)

    # Sketch8 → Cut-Extrude5 (cut, through all)
    with BuildSketch(Plane(origin=(0, 2, 0), x_dir=(1, 0, 0), z_dir=(0, 1, 0))):
        with Locations(Location((-52.5, 0, 0), (0, 0, 270))):
            Circle(SKETCH8_R)
        with Locations(Location((52.5, 0, 0), (0, 0, 90))):
            Circle(SKETCH8_R)
    extrude(amount=-CUT_EXTRUDE5_DEPTH, mode=Mode.SUBTRACT)


solid = part.part
